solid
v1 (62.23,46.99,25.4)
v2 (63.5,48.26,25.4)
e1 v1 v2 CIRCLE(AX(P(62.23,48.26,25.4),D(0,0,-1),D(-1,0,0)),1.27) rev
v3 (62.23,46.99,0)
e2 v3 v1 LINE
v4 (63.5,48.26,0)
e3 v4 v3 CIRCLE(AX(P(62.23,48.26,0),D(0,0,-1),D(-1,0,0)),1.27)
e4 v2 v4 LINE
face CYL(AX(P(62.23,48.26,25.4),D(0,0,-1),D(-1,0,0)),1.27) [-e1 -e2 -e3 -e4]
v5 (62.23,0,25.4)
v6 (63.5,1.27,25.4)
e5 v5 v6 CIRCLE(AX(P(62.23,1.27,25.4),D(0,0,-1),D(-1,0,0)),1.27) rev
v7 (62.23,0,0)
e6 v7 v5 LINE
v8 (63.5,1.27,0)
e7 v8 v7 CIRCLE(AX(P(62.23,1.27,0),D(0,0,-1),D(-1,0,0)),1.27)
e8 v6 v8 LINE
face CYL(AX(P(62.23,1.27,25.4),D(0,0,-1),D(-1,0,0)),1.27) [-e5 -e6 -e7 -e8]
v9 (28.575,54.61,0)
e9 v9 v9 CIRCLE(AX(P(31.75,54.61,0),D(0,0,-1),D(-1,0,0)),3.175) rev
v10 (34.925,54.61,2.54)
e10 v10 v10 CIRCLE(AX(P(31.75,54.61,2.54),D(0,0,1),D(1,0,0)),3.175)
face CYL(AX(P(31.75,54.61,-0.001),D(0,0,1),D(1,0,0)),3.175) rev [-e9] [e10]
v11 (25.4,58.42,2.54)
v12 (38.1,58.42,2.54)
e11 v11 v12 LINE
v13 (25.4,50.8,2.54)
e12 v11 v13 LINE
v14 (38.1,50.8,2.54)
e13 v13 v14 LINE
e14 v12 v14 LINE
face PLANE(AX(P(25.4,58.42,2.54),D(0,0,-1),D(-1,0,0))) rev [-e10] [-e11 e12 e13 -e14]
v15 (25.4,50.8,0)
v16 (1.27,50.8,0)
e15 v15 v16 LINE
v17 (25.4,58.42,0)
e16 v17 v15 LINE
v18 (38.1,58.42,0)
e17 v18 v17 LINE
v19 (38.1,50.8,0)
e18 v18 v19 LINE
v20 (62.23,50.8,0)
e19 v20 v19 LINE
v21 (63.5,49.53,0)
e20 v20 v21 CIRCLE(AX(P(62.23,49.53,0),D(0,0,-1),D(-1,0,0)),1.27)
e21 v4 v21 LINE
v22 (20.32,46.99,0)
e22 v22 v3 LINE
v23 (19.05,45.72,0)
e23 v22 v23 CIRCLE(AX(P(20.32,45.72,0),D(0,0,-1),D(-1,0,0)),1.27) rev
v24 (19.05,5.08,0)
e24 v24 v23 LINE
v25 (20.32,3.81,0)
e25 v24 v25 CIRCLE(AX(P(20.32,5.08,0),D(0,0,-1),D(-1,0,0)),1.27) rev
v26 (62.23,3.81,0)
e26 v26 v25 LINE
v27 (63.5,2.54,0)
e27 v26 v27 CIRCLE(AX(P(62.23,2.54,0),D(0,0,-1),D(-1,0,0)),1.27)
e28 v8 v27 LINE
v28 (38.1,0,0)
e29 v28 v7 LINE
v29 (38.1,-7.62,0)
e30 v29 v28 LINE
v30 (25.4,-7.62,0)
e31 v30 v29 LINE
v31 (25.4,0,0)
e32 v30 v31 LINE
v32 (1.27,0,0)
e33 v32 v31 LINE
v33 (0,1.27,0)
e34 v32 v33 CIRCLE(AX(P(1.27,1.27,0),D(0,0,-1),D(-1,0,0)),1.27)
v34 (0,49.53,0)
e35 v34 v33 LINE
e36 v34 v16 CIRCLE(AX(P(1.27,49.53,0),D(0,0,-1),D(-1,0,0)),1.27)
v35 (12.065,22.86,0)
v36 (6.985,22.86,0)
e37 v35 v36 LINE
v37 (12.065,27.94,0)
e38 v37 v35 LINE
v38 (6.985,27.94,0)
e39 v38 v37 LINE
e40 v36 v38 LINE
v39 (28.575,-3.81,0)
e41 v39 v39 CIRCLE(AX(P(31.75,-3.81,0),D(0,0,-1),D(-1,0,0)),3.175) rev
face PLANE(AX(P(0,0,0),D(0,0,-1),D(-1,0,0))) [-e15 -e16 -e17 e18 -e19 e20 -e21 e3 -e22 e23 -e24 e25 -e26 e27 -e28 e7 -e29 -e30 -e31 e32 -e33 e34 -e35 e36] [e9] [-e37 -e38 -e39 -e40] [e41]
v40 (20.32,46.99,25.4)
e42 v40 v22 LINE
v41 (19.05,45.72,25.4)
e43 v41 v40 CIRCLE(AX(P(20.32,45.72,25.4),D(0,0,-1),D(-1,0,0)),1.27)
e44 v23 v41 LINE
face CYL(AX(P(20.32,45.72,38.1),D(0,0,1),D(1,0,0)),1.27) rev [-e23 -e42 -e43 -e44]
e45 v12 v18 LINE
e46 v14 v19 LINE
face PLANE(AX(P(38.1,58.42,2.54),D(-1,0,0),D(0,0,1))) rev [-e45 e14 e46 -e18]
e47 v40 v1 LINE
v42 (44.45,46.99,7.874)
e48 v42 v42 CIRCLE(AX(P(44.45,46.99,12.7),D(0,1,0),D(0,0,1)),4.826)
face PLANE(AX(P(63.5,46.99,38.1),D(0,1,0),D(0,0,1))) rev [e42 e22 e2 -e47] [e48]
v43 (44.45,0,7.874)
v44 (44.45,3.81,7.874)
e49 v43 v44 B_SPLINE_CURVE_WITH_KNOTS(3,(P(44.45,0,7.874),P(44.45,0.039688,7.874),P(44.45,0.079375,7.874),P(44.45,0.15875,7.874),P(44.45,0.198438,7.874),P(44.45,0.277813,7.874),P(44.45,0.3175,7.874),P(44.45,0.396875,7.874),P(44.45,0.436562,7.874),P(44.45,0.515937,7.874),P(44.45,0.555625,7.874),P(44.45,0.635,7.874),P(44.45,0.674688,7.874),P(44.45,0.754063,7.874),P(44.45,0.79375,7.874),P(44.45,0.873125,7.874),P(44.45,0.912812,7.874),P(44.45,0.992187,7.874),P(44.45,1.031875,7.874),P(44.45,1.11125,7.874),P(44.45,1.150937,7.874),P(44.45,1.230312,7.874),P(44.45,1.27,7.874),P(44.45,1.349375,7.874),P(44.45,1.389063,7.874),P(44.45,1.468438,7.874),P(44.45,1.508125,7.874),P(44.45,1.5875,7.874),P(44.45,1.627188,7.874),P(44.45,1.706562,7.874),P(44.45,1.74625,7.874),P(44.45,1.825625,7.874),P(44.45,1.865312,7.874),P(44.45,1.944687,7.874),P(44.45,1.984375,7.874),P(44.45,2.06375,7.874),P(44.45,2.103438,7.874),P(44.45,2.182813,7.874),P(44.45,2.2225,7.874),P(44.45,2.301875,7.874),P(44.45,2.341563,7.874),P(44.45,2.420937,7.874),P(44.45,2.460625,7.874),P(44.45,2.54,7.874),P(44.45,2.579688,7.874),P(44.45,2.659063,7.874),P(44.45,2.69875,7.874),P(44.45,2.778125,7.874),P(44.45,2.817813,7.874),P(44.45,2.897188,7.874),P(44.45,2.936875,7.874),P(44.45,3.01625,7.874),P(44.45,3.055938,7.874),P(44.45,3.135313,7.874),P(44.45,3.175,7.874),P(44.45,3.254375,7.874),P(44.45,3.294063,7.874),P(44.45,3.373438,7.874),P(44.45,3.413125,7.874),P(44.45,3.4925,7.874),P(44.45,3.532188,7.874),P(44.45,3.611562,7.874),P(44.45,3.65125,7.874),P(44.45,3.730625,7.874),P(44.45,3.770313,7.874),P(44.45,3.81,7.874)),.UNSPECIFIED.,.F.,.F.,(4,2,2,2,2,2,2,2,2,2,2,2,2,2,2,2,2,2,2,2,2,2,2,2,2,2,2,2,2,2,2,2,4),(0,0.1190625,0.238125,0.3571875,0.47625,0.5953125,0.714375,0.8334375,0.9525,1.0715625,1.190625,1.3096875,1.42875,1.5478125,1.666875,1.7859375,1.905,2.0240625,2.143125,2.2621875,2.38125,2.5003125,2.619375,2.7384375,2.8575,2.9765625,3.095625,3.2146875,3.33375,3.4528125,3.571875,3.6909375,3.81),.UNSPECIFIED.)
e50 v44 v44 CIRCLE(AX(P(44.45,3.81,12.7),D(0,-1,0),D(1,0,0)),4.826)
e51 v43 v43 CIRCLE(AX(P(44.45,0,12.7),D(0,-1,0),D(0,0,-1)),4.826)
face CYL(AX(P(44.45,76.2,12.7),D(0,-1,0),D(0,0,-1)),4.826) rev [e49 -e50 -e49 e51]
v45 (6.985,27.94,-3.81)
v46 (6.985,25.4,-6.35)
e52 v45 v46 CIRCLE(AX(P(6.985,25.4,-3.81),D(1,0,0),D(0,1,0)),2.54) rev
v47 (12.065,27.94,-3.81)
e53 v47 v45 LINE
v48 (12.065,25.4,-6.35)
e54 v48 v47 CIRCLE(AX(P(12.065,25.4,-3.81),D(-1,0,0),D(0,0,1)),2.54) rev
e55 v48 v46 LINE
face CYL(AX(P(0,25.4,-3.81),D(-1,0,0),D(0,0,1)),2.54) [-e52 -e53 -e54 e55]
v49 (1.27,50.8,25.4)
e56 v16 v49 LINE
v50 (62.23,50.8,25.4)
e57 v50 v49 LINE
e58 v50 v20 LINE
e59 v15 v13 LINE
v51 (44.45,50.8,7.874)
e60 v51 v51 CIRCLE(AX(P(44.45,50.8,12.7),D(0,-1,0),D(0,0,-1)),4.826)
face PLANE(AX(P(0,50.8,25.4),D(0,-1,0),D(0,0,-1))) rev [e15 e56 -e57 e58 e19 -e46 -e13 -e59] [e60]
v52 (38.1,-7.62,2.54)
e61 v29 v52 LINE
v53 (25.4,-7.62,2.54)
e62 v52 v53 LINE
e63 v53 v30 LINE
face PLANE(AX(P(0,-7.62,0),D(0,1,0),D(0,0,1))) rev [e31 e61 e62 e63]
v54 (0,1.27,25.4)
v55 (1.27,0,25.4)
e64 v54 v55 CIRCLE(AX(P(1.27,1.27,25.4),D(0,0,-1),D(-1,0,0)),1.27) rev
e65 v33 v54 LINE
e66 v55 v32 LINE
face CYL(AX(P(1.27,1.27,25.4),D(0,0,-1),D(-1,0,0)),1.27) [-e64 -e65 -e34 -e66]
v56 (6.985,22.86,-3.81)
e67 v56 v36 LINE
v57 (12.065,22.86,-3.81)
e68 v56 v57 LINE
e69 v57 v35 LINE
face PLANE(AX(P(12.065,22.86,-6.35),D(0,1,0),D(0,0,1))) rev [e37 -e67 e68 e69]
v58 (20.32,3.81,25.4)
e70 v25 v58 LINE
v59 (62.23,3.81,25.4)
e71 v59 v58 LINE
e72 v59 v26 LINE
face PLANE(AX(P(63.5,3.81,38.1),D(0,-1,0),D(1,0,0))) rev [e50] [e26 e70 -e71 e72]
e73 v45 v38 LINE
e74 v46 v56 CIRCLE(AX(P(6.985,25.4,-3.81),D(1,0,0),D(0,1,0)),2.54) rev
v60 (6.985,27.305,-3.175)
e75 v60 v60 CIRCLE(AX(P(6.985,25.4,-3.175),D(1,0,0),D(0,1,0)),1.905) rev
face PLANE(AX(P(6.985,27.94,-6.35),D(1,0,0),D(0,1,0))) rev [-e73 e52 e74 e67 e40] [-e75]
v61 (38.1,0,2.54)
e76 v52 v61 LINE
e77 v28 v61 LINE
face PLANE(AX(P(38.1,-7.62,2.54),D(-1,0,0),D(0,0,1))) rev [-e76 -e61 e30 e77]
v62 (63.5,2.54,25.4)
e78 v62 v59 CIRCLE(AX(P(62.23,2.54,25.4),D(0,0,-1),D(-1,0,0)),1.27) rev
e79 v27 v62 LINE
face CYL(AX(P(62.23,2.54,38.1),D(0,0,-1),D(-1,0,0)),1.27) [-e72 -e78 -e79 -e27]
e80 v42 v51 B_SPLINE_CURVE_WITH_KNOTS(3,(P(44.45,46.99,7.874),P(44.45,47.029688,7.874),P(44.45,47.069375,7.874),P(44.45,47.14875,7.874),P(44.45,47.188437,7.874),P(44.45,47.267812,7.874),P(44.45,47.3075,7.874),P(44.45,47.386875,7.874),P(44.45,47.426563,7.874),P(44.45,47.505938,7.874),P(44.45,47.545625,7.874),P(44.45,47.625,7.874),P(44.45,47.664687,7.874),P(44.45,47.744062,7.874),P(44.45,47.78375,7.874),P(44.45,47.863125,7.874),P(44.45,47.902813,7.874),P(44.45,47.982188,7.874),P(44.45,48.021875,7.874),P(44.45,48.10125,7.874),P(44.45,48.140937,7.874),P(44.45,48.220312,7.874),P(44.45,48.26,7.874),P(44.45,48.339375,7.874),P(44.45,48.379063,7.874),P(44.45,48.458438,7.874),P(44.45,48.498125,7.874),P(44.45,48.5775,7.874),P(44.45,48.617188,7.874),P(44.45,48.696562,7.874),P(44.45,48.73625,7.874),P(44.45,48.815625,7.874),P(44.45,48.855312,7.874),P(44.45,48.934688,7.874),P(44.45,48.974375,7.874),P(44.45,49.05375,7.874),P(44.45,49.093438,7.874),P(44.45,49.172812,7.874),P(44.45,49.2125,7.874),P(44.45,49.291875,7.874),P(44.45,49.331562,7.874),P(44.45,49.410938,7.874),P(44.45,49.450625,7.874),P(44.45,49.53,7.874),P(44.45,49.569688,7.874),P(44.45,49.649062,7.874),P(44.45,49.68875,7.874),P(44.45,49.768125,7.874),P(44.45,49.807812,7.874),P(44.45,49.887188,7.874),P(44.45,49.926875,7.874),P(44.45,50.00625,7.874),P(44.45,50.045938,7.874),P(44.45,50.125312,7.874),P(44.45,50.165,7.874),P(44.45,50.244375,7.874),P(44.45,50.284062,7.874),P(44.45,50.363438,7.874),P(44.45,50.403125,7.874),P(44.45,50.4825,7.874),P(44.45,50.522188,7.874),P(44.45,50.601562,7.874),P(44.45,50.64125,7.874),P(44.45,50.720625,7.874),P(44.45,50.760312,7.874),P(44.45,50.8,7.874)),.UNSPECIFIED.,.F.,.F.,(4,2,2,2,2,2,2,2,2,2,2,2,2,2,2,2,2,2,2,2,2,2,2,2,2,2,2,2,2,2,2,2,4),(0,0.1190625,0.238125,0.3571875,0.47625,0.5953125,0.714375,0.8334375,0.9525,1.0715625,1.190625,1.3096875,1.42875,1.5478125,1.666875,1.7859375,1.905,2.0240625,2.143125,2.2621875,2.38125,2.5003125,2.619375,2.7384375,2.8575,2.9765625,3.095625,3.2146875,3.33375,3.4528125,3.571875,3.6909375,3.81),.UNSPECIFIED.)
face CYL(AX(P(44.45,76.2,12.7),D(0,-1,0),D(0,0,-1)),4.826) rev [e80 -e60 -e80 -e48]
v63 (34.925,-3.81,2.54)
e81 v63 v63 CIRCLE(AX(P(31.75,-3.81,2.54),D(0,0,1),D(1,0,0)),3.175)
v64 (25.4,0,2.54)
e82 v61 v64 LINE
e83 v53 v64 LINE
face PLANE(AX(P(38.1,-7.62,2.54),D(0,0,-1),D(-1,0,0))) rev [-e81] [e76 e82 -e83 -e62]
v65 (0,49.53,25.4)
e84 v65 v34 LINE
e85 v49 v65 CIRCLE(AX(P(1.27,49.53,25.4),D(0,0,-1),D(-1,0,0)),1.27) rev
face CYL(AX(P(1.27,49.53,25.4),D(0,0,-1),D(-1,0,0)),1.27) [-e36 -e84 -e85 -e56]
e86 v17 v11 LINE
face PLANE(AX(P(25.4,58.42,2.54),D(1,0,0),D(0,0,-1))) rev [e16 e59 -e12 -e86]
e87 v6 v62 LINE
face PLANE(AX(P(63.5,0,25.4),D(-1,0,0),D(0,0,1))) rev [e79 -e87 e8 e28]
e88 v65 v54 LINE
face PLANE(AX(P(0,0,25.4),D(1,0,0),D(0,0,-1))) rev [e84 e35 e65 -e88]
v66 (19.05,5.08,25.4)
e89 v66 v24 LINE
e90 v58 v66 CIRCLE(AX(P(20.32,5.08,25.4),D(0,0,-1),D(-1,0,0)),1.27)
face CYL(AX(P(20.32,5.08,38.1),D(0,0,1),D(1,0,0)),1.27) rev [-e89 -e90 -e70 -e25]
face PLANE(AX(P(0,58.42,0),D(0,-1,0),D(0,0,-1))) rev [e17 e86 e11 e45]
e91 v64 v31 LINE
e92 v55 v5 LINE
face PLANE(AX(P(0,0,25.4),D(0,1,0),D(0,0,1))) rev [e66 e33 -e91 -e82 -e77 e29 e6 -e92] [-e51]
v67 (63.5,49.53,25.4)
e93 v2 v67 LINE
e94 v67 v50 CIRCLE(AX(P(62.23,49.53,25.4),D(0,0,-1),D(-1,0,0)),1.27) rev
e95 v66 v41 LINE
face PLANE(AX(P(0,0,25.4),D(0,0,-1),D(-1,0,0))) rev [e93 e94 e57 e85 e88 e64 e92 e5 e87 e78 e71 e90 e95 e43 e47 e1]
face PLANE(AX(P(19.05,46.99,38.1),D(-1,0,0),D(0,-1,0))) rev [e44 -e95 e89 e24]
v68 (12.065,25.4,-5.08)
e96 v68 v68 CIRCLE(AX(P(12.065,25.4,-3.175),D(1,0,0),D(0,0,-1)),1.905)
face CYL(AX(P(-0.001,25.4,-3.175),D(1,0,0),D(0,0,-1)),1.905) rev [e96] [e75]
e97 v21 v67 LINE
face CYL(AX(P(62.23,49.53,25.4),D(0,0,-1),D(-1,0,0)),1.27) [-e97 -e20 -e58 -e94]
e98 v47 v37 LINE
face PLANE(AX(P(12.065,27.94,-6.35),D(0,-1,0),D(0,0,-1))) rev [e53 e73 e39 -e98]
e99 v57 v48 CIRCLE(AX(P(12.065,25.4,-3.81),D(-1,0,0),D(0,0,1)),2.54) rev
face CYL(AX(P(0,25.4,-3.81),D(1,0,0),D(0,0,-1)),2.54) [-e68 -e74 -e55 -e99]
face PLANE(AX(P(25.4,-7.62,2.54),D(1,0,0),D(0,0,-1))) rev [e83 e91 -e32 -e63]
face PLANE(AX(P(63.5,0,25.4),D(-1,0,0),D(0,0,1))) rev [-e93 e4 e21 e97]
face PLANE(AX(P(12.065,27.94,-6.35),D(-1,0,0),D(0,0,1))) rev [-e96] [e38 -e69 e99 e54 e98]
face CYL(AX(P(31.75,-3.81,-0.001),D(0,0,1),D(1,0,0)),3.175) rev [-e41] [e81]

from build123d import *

# Parameters (mm, degrees)
SKETCH1_W           = 63.5
SKETCH1_H           = 50.8
BOSS_EXTRUDE1_DEPTH = 25.4
SKETCH3_W           = 44.45
SKETCH3_H           = 43.18
CUT_EXTRUDE1_DEPTH  = 38.1
SKETCH5_R           = 4.826
CUT_EXTRUDE2_DEPTH  = 76.2
FILLET3_R           = 1.27
SKETCH10_W          = 12.7
SKETCH10_H          = 2.54
BOSS_EXTRUDE4_DEPTH = 7.62
SKETCH11_W          = 12.7
SKETCH11_H          = 2.54
BOSS_EXTRUDE5_DEPTH = 7.62
CUT_EXTRUDE5_REACH  = 91.262
SKETCH12_R          = 3.175
SKETCH13_W          = 5.08
SKETCH13_H          = 5.08
BOSS_EXTRUDE6_DEPTH = 6.35
CUT_EXTRUDE6_REACH  = 83.876
SKETCH15_R          = 1.905
FILLET5_R           = 2.54


with BuildPart() as part:
    # Sketch1 → Boss-Extrude1 (new body)
    with BuildSketch(Plane.XY):
        with Locations((31.75, 25.4)):
            Rectangle(SKETCH1_W, SKETCH1_H)
    extrude(amount=BOSS_EXTRUDE1_DEPTH)

    # Sketch3 → Cut-Extrude1 (cut)
    with BuildSketch(Plane(origin=(0, 0, 0), x_dir=(-1, 0, 0), z_dir=(0, 0, -1))):
        with Locations((-41.275, 25.4)):
            Rectangle(SKETCH3_W, SKETCH3_H)
    extrude(amount=-CUT_EXTRUDE1_DEPTH, mode=Mode.SUBTRACT)

    # Sketch5 → Cut-Extrude2 (cut)
    with BuildSketch(Plane.XZ):
        with Locations(Location((44.45, 12.7, 0), (0, 0, 270))):
            Circle(SKETCH5_R)
    extrude(amount=-CUT_EXTRUDE2_DEPTH, mode=Mode.SUBTRACT)

    # Fillet3
    fillet3_edges = [part.edges().sort_by_distance(p)[0] for p in [
        (63.5, 3.81, 12.7),
        (63.5, 46.99, 12.7),
        (19.05, 46.99, 12.7),
        (19.05, 3.81, 12.7),
        (0, 50.8, 12.7),
        (63.5, 50.8, 12.7),
        (63.5, 0, 12.7),
        (0, 0, 12.7),
    ]]
    fillet(fillet3_edges, radius=FILLET3_R)

    # Sketch10 → Boss-Extrude4 (add)
    with BuildSketch(Plane.XZ):
        with Locations((31.75, 1.27)):
            Rectangle(SKETCH10_W, SKETCH10_H)
    extrude(amount=BOSS_EXTRUDE4_DEPTH)

    # Sketch11 → Boss-Extrude5 (add)
    with BuildSketch(Plane(origin=(0, 50.8, 0), x_dir=(1, 0, 0), z_dir=(0, 1, 0))):
        with Locations((31.75, -1.27)):
            Rectangle(SKETCH11_W, SKETCH11_H)
    extrude(amount=BOSS_EXTRUDE5_DEPTH)

    # Sketch12 → Cut-Extrude5 (cut, up to next)
    with BuildSketch(Plane.XY.offset(2.54), mode=Mode.PRIVATE) as cut_extrude5_sk1:
        with Locations((31.75, 54.61)):
            Circle(SKETCH12_R)
    cut_extrude5_tool1 = extrude(cut_extrude5_sk1.sketch, amount=-CUT_EXTRUDE5_REACH, mode=Mode.PRIVATE) & part.part
    # Sketch12 → Cut-Extrude5 (cut, up to next)
    with BuildSketch(Plane.XY.offset(2.54), mode=Mode.PRIVATE) as cut_extrude5_sk2:
        with Locations((31.75, -3.81)):
            Circle(SKETCH12_R)
    cut_extrude5_tool2 = extrude(cut_extrude5_sk2.sketch, amount=-CUT_EXTRUDE5_REACH, mode=Mode.PRIVATE) & part.part
    add(cut_extrude5_tool1.solids().sort_by_distance((31.75, 54.61, 2.54))[0], mode=Mode.SUBTRACT)
    add(cut_extrude5_tool2.solids().sort_by_distance((31.75, -3.81, 2.54))[0], mode=Mode.SUBTRACT)

    # Sketch13 → Boss-Extrude6 (add)
    with BuildSketch(Plane(origin=(0, 0, 0), x_dir=(-1, 0, 0), z_dir=(0, 0, -1))):
        with Locations((-9.525, 25.4)):
            Rectangle(SKETCH13_W, SKETCH13_H)
    extrude(amount=BOSS_EXTRUDE6_DEPTH)

    # Sketch15 → Cut-Extrude6 (cut, up to next)
    with BuildSketch(Plane(origin=(12.065, 0, 0), x_dir=(0, 0, -1), z_dir=(1, 0, 0)), mode=Mode.PRIVATE) as cut_extrude6_sk1:
        with Locations((3.175, 25.4)):
            Circle(SKETCH15_R)
    cut_extrude6_tool1 = extrude(cut_extrude6_sk1.sketch, amount=-CUT_EXTRUDE6_REACH, mode=Mode.PRIVATE) & part.part
    add(cut_extrude6_tool1.solids().sort_by_distance((12.065, 25.4, -3.175))[0], mode=Mode.SUBTRACT)

    # Fillet5
    fillet5_edges = [part.edges().sort_by_distance(p)[0] for p in [
        (9.525, 27.94, -6.35),
        (9.525, 22.86, -6.35),
    ]]
    fillet(fillet5_edges, radius=FILLET5_R - 0.0001)  # a hair under: the kernel refuses the full size


solid = part.part
